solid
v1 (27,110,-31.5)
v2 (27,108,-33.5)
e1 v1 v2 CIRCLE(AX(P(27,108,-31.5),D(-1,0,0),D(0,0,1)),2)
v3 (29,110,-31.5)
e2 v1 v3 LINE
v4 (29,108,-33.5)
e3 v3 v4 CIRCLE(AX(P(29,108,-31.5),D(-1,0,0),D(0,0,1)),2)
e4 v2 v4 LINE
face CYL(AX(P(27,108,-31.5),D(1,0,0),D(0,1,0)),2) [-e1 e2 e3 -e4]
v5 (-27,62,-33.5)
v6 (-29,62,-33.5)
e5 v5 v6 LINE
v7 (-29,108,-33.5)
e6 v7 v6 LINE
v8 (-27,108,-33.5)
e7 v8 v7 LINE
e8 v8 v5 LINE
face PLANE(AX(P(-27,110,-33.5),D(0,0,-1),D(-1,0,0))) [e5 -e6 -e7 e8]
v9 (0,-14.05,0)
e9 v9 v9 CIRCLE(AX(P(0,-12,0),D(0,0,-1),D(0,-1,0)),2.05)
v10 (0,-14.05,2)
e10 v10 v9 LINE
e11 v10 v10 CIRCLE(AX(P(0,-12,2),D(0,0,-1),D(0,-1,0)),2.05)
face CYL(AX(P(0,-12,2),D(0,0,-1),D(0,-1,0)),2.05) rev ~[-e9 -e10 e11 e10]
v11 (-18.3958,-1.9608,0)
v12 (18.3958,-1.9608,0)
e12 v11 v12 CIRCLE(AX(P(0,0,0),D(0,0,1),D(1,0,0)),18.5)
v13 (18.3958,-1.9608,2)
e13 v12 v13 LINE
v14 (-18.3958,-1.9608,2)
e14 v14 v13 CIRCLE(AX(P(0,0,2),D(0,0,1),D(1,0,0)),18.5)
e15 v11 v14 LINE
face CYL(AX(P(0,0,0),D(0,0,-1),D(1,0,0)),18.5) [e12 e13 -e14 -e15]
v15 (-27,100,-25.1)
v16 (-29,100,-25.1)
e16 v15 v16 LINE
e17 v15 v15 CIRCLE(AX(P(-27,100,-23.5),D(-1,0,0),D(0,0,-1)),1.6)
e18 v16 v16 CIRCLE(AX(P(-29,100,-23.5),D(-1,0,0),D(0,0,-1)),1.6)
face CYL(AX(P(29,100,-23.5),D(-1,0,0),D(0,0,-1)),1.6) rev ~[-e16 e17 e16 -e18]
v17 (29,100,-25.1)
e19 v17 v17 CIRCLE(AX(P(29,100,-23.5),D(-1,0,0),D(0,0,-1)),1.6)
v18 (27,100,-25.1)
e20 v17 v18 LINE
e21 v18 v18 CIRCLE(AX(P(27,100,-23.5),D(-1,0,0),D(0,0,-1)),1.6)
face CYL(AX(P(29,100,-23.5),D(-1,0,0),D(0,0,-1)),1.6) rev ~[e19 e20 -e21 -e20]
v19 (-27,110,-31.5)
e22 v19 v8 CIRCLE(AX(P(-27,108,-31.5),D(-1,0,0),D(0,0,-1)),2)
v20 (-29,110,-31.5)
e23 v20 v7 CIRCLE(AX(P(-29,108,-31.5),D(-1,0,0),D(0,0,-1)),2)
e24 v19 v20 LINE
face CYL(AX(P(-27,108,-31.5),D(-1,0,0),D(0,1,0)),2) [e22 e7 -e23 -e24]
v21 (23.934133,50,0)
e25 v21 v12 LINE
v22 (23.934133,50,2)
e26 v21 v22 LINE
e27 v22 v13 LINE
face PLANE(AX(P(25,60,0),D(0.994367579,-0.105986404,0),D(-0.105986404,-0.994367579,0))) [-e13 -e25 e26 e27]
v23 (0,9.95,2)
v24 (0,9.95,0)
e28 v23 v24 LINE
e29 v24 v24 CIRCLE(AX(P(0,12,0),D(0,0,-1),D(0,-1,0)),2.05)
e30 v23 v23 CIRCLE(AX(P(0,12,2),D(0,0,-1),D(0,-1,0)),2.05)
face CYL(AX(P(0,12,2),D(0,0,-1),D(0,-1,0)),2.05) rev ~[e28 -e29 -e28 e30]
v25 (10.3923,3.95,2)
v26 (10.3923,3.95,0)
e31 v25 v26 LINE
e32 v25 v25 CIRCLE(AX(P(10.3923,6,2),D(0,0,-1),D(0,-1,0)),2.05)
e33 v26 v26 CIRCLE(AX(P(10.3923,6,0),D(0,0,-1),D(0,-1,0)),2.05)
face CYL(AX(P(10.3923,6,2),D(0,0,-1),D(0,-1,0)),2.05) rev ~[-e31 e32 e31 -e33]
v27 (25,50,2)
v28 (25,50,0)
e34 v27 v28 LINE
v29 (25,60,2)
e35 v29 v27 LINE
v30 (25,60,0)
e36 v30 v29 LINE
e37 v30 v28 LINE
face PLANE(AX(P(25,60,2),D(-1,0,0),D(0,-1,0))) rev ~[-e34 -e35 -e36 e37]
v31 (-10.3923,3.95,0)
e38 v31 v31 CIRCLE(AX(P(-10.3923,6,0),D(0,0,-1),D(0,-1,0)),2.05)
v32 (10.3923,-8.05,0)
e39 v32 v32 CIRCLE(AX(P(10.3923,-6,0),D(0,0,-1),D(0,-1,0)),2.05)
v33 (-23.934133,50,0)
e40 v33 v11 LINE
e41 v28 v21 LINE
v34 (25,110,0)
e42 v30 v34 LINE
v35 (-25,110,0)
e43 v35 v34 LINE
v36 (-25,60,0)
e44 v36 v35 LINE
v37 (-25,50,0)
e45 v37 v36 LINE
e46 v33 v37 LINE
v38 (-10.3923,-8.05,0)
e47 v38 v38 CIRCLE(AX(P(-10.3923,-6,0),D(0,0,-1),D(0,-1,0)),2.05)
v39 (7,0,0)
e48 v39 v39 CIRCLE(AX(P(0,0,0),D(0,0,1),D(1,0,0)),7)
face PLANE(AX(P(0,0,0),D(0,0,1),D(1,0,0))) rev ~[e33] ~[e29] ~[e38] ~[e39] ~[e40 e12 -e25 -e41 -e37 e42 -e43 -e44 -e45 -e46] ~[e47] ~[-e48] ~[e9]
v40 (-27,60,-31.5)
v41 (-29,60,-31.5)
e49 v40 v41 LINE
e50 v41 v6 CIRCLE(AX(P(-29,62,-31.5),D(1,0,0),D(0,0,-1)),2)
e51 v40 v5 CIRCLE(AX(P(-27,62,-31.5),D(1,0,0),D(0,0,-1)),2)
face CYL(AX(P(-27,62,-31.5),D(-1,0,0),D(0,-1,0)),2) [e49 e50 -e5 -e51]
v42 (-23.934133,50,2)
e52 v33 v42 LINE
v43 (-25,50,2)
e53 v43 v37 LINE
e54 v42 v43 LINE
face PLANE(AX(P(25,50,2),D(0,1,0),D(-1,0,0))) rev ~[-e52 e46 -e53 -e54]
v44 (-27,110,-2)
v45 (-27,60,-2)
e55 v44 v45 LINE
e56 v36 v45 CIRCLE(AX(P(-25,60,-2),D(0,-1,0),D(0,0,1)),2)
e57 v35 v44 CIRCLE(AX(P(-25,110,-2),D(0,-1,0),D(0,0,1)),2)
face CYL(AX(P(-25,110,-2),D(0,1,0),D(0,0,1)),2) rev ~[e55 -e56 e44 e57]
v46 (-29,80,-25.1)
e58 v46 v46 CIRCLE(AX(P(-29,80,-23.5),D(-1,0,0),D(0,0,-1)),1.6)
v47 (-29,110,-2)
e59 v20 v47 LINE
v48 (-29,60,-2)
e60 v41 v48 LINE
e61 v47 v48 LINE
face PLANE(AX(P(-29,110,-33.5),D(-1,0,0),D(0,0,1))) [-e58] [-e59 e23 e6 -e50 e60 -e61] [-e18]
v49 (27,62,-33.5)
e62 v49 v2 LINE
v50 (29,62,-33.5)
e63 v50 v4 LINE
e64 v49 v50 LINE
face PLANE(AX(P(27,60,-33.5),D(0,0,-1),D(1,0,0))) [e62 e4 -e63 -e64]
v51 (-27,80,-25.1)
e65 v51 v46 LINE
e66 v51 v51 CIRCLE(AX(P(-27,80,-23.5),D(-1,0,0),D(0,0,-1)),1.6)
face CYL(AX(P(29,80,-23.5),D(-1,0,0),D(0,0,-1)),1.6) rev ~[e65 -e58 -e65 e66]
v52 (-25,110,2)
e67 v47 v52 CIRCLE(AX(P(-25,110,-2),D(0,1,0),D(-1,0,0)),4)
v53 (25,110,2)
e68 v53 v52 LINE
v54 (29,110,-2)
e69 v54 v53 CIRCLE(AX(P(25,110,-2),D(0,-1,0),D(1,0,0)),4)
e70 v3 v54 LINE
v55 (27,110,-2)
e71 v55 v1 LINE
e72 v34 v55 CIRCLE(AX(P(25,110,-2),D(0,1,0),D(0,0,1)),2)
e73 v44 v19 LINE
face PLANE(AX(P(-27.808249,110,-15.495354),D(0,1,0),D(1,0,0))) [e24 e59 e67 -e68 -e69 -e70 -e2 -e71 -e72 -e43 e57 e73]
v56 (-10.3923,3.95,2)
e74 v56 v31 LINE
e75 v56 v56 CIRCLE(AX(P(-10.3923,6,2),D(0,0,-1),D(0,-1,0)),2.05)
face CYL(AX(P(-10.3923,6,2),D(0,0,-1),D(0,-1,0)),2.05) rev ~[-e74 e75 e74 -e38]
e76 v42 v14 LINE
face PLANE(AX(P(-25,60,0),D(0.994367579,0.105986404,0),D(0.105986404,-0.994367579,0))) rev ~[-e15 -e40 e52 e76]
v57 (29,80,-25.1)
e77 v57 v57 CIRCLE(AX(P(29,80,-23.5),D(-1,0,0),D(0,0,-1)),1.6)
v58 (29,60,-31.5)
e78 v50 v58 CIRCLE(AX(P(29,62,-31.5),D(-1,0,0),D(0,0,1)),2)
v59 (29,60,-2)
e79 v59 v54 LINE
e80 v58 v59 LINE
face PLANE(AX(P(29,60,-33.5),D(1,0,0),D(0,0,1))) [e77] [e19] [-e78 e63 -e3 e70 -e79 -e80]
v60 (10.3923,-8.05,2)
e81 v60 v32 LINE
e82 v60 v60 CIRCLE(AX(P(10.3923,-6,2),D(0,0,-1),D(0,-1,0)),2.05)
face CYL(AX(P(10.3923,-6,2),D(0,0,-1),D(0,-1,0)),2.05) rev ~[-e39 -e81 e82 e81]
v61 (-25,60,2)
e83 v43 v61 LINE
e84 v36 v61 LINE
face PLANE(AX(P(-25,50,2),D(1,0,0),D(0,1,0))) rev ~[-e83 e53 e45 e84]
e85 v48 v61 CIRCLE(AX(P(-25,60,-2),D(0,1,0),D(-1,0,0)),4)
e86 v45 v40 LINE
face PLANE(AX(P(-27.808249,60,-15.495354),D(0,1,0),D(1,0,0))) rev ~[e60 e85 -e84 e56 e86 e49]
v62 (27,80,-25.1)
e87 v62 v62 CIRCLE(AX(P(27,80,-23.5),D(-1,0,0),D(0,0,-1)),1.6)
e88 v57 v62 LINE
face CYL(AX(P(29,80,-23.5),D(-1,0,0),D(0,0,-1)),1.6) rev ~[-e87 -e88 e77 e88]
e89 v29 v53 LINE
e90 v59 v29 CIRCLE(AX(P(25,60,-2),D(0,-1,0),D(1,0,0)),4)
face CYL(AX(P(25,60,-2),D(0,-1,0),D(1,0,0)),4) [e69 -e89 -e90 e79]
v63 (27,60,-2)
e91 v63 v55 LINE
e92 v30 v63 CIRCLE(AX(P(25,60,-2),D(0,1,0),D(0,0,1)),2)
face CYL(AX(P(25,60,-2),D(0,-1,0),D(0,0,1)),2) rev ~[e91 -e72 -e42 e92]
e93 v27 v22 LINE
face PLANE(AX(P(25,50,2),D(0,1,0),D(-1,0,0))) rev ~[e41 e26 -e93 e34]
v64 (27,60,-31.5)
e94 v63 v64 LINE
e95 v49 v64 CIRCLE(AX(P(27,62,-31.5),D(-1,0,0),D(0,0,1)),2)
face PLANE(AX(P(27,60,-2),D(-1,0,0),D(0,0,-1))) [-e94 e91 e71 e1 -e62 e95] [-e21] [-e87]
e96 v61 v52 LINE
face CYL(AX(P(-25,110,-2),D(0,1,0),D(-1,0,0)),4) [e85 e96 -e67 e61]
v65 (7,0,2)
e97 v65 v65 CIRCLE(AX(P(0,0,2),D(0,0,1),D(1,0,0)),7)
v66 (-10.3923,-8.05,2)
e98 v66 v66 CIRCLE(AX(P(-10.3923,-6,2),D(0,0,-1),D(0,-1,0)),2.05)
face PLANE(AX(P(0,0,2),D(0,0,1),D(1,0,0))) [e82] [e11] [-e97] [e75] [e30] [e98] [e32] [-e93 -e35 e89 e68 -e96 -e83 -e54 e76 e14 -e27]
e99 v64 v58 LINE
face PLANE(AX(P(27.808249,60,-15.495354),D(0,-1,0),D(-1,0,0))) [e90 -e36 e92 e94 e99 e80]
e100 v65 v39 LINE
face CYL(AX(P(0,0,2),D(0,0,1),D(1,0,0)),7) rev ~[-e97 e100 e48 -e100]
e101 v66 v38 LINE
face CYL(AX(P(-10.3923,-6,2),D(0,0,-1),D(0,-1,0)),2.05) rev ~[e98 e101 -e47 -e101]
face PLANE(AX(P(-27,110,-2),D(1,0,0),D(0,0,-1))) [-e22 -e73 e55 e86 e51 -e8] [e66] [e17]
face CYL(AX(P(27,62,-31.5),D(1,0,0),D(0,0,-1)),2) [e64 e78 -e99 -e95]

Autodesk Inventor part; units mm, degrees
ref_plane "YZ Plane" through (0, 0, 0) normal (1, 0, 0) x (0, 1, 0)
ref_plane "XZ Plane" through (0, 0, 0) normal (0, 1, 0) x (-1, 0, 0)
ref_plane "XY Plane" through (0, 0, 0) normal (0, 0, 1) x (1, 0, 0)
sketch "スケッチ1" plane through (0, 0, 0) normal (0, 0, 1) x (1, 0, 0)
  circle A0 centre (0, 0) radius 18.5
  line L0 (0, 0) -> (0, 60)
  line L1 (0, 60) -> (25, 60)
  line L2 (25, 60) -> (25, 110)
  line L3 (25, 110) -> (0, 110)
  line L4 (0, 110) -> (0, 60)
  line L5 (25, 60) -> (18.3958, -1.9608)
  line L6 (0, 60) -> (-25, 60)
  line L7 (-25, 60) -> (-25, 110)
  line L8 (-25, 110) -> (0, 110)
  line L9 (-25, 60) -> (-18.3958, -1.9608)
  point P0 (-18.3958, -1.9608)
  dimension "d0" = 37
  dimension "d1" = 60
  dimension "d2" = 50
  dimension "d3" = 25
extrude "プレート1" add sketch "スケッチ1" along normal blind 2
sketch "スケッチ2" plane through (27, 60, -2) normal (1, 0, 0) x (0, 1, 0)
  line L0 (50, 0) -> (0, 0)
  line L1 (0, 0) -> (0, -31.5)
  line L2 (0, -31.5) -> (50, -31.5)
  line L3 (50, -31.5) -> (50, 0)
edge flange "フランジ1" height 35.5 angle 90 thickness 2 bend radius 2 thickness toward (1, 0, 0) relief tear relief width 2 relief depth 1 edges at (25, 85, 0) wall of the first edge with corners at (27, 110, -2) (27, 60, -2) (27, 60, -33.5) (27, 110, -33.5)
bend "曲げ1"
corner "コーナー1"
sketch "スケッチ3" plane through (-27, 110, -2) normal (-1, 0, 0) x (0, -1, 0)
  line L0 (50, 0) -> (0, 0)
  line L1 (0, 0) -> (0, -31.5)
  line L2 (0, -31.5) -> (50, -31.5)
  line L3 (50, -31.5) -> (50, 0)
edge flange "フランジ2" height 35.5 angle 90 thickness 2 bend radius 2 thickness toward (-1, 0, 0) relief tear relief width 2 relief depth 1 edges at (-25, 85, 0) wall of the first edge with corners at (-27, 60, -2) (-27, 110, -2) (-27, 110, -33.5) (-27, 60, -33.5)
bend "曲げ2"
corner "コーナー2"
sketch "スケッチ4" plane through (0, 0, 2) normal (0, 0, 1) x (1, 0, 0)
  circle A0 centre (0, 0) radius 7
  dimension "d25" = 14
extrude "押し出し1" cut sketch "スケッチ4" against normal blind 10
sketch "スケッチ5" plane through (0, 0, 2) normal (0, 0, 1) x (1, 0, 0)
  circle A0 centre (0, 0) radius 12
  point P0 (0, 12)
  point P1 (-10.3923, 6)
  point P2 (-10.3923, -6)
  point P3 (0, -12)
  point P4 (10.3923, -6)
  point P5 (10.3923, 6)
  dimension "d28" = 24
  dimension "d31" = 360
hole "穴1" at (0, 12, 2) at (-10.3923, 6, 2) at (-10.3923, -6, 2) at (0, -12, 2) at (10.3923, -6, 2) at (10.3923, 6, 2) direction (0, 0, -1) diameter 4.1 end through all
sketch "スケッチ6" plane through (29, 60, -33.5) normal (1, 0, 0) x (0, 0, -1)
  line L0 (0, 0) -> (0, 50) projected
  line L1 (0, 10) -> (-31.5, 10)
  line L2 (-31.5, 50) -> (-31.5, 0) projected
  line L3 (0, 0) -> (-31.5, 0) projected
  line L4 (0, 50) -> (-31.5, 50) projected
  line L5 (-10, 50) -> (-10, 10)
  point P0 (-33.5, -60)
  point P1 (-10, 20)
  point P2 (-10, 40)
  point P3 (-33.5, 50)
  dimension "d40" = 10
  dimension "d42" = 10
  dimension "d43" = 20
  dimension "d62" = 23.5
hole "穴2" at (29, 80, -23.5) at (29, 100, -23.5) direction (-1, 0, 0) diameter 3.2 end through all
sketch "スケッチ7" plane through (0, 0, 2) normal (0, 0, 1) x (1, 0, 0)
  line L0 (-15, 100) -> (15, 100)
  line L1 (15, 100) -> (15, 60)
  line L2 (15, 60) -> (-15, 60)
  line L3 (-15, 60) -> (-15, 100)
  line L4 (-25, 110) -> (25, 110) projected
  line L5 (-25, 60) -> (-25, 110) projected
  line L6 (25, 110) -> (25, 60) projected
  circle A0 centre (0, 0) radius 7 projected
  circle A1 centre (0, 0) radius 8.5
  line L7 (-8.4521, -0.9009) -> (-13.8775, 50)
  line L8 (-18.3958, -1.9608) -> (-25, 60) projected
  line L9 (8.4521, -0.9009) -> (13.8775, 50)
  line L10 (25, 60) -> (18.3958, -1.9608) projected
  line L11 (-13.8775, 50) -> (13.8775, 50)
  line L12 (-10.6799, 20) -> (10.6799, 20)
  dimension "d51" = 10
  dimension "d52" = 10
  dimension "d53" = 10
  dimension "d54" = 40
  dimension "d55" = 10
  dimension "d56" = 10
  dimension "d57" = 20
extrude "押し出し2" [suppressed]
fillet "フィレット1" [suppressed]
fillet "フィレット2" radius 2 4 edges at (-28, 60, -33.5) (-28, 110, -33.5) (28, 60, -33.5) (28, 110, -33.5)
sketch "スケッチ8" plane through (0, 0, 2) normal (0, 0, 1) x (1, 0, 0)
  line L0 (-25, 110) -> (-25, 60) projected
  line L1 (-25, 60) -> (25, 60)
  line L2 (25, 60) -> (25, 50)
  line L3 (25, 50) -> (-25, 50)
  line L4 (-25, 50) -> (-25, 60)
  point P0 (0, 0)
  dimension "d63" = 10
extrude "押し出し3" add sketch "スケッチ8" against normal blind 2
equation "\"d38\" = Thickness"
equation "\"d4\" = Thickness"
equation "\"d5\" = BendReliefWidth"
equation "\"d6\" = BendReliefDepth"
equation "\"d7\" = MinimumRemnant"
equation "\"d8\" = TransitionRadius"
equation "\"d11\" = BendRadius"
equation "\"d12\" = CornerReliefSize"
equation "\"d13\" = GapSize"
equation "\"d14\" = JacobiRadiusSize"
equation "\"d15\" = BendReliefWidth"
equation "\"d16\" = BendReliefDepth"
equation "\"d17\" = MinimumRemnant"
equation "\"d18\" = TransitionRadius"
equation "\"d21\" = BendRadius"
equation "\"d22\" = CornerReliefSize"
equation "\"d23\" = GapSize"
equation "\"d24\" = JacobiRadiusSize"
equation "\"BendRadius\" = Thickness"
equation "\"BendReliefWidth\" = Thickness"
equation "\"BendReliefDepth\" = 0.5 * Thickness"
equation "\"CornerReliefSize\" = 4 * Thickness"
equation "\"MinimumRemnant\" = 2 * Thickness"
equation "\"TransitionRadius\" = BendRadius"
equation "\"JacobiRadiusSize\" = BendRadius"
equation "\"GapSize\" = Thickness"
equation "\"Thickness\" = 2"
properties part number "servoplate1_forR6" material "アルミニウム 6061"
